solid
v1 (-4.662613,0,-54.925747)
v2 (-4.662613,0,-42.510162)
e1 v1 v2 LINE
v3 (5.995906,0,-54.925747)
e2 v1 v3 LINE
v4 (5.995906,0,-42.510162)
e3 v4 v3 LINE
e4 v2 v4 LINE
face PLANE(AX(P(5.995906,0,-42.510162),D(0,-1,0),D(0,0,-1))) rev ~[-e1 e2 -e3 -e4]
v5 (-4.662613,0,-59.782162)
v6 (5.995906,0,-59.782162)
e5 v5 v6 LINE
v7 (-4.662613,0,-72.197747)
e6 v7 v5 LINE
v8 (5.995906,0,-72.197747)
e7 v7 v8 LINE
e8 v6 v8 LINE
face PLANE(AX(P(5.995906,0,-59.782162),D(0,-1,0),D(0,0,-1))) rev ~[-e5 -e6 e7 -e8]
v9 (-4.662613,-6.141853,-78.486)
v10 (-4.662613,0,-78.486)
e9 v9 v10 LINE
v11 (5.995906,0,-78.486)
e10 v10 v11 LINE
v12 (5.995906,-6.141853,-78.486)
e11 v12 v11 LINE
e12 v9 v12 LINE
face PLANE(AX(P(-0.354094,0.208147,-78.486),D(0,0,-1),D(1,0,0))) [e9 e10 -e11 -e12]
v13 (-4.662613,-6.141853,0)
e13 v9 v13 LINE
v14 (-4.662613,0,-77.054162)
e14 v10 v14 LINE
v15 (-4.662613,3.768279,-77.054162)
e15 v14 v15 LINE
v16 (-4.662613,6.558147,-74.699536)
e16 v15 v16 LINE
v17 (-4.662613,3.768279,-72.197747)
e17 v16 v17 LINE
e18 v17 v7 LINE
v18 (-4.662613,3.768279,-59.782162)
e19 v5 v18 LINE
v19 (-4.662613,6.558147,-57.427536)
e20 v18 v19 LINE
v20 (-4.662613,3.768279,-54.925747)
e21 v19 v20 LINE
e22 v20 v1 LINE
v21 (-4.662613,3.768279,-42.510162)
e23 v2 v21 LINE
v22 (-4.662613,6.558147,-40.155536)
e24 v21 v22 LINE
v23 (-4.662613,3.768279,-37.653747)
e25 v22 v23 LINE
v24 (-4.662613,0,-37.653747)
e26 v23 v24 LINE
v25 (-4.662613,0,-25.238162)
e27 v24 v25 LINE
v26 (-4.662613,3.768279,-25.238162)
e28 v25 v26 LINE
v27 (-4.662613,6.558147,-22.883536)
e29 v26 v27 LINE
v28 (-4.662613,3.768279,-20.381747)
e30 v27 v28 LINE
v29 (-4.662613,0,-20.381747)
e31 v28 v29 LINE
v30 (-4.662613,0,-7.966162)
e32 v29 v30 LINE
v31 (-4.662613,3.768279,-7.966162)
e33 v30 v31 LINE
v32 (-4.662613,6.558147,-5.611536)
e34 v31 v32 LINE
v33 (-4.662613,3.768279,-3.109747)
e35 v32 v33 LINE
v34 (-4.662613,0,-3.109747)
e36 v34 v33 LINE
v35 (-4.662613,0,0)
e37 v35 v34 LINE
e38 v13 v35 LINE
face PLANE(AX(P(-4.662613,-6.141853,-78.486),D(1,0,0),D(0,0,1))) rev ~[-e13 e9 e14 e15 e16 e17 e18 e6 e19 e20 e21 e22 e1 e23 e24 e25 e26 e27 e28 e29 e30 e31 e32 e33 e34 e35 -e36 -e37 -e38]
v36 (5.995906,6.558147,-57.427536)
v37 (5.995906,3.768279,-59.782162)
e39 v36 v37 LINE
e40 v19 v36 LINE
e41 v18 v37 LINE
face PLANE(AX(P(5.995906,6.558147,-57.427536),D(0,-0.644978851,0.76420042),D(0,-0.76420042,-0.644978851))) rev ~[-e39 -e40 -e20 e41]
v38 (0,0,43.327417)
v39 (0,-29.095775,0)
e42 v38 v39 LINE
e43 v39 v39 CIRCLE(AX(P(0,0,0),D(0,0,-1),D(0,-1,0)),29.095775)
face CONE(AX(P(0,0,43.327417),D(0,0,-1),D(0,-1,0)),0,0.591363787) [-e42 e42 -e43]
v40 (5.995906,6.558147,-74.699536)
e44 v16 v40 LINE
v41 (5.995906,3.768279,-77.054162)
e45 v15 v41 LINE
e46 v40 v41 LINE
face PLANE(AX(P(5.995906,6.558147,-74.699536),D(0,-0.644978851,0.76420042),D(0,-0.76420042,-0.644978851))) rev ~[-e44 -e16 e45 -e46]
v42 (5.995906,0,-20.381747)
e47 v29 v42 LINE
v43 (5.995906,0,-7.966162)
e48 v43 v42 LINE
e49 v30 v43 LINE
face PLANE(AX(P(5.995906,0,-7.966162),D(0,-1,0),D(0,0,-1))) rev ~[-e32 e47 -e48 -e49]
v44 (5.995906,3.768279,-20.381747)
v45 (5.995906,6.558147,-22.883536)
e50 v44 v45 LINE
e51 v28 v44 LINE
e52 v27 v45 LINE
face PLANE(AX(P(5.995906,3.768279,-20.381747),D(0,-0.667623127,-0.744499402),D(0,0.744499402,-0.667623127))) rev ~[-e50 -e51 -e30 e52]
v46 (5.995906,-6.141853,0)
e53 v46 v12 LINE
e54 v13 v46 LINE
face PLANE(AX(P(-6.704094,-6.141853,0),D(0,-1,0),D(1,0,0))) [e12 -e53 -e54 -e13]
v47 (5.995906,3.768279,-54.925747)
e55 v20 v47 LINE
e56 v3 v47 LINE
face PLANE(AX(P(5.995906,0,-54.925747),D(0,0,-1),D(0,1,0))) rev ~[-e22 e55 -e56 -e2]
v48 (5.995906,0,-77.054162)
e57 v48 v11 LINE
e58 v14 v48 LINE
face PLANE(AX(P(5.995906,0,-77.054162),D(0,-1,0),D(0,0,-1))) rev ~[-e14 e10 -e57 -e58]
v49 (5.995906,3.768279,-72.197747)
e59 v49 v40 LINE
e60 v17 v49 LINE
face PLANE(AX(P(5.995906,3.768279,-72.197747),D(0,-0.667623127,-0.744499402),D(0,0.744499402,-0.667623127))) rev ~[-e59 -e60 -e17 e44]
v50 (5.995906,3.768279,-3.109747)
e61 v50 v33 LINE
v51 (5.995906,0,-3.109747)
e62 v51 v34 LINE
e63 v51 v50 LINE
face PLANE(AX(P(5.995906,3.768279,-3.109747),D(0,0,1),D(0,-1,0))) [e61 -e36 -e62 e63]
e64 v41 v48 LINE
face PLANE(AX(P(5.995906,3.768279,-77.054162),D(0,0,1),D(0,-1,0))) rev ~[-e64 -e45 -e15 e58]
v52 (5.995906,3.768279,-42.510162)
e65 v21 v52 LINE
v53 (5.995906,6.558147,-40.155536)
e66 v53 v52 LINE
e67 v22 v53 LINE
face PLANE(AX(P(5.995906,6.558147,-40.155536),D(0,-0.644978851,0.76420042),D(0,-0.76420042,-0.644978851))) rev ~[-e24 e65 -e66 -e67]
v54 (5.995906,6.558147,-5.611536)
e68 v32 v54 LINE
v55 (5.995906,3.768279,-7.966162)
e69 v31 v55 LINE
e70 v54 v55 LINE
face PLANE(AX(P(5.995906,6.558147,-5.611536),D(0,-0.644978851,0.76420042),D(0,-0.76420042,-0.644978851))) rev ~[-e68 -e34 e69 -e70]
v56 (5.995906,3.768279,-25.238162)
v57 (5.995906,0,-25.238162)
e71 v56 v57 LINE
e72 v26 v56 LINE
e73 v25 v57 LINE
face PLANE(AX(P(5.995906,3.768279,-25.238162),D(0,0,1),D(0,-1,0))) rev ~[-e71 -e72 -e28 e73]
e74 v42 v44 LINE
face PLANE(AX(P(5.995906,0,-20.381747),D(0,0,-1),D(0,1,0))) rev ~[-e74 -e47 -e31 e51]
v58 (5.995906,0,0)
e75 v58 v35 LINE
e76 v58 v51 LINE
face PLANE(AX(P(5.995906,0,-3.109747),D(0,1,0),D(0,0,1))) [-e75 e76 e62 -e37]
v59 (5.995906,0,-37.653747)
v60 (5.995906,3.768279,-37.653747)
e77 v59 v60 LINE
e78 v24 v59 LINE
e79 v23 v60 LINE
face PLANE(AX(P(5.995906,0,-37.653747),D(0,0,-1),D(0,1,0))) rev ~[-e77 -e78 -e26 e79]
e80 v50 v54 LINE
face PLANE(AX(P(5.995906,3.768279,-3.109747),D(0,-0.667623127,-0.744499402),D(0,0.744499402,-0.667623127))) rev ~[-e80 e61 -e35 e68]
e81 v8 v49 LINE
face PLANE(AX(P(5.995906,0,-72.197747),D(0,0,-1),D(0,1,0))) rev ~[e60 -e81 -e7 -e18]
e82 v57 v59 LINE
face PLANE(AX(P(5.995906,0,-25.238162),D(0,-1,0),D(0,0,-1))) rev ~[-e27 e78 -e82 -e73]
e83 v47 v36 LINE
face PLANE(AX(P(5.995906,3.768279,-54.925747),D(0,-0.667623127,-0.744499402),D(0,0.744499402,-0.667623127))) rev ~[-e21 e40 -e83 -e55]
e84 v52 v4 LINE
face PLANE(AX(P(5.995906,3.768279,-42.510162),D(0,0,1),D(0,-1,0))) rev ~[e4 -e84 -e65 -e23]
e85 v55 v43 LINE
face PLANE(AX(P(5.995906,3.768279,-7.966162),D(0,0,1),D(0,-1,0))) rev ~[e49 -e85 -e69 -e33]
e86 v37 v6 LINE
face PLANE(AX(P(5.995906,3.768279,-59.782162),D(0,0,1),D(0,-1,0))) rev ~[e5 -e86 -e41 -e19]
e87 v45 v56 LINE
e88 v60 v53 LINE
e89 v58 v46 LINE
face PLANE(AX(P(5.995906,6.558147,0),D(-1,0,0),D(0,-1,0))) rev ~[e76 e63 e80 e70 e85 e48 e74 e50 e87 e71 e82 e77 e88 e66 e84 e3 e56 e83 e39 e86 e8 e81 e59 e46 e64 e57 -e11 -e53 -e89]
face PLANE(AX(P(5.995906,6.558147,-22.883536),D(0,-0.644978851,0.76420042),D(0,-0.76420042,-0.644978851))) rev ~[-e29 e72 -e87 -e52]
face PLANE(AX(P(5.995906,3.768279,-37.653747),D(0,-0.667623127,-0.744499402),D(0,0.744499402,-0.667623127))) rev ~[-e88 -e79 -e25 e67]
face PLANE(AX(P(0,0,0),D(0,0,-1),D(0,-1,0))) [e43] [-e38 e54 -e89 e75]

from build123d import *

# Parameters (mm, degrees)
F3_W      = 12.7
F3_H      = 12.7
F4_DEPTH  = 78.486
F6_DEPTH  = 56.134
F8_DEPTH  = 25.4
F10_DEPTH = 25.4


# Not quite as in the source:
# - a feature names something its author has since deleted; it is built from what else it names


with BuildPart() as f1:
    # F0 (on Right) → F1 (revolve)
    with BuildSketch(Plane.YZ):
        Polygon((0, 43.3274172246), (-29.0957745165, 0), (0, 0), align=None)
    revolve(axis=Axis((0, 0, 21.6637086123), (0, 0, -1)))

    # F3 (on face) → F4 (join)
    with BuildSketch(Plane(origin=(0, 0, 0), x_dir=(1, 0, 0), z_dir=(0, 0, -1))):
        with Locations((-0.3540940419, -0.2081472591)):
            Rectangle(F3_W, F3_H)
    extrude(amount=F4_DEPTH)

    # F5 (on face) → F6 (join)
    with BuildSketch(Plane.YZ.offset(5.9959059581)):
        Polygon((0, -7.9661617056), (0, -3.1097470783), (0, 0), (-6.1418527409, 0), (-6.1418527409, -78.486), (0, -78.486), (0, -77.0541617056), (0, -72.1977470783), (0, -59.7821617056), (0, -54.9257470783), (0, -42.5101617056), (0, -37.6537470783), (0, -25.2381617056), (0, -20.3817470783), align=None)
        Polygon((3.7682792172, -3.1097470783), (0, -3.1097470783), (0, -7.9661617056), (3.7682792172, -7.9661617056), (6.5581472591, -5.6115360931), align=None)
        Polygon((3.7682792172, -20.3817470783), (0, -20.3817470783), (0, -25.2381617056), (3.7682792172, -25.2381617056), (6.5581472591, -22.8835360931), align=None)
        Polygon((3.7682792172, -42.5101617056), (6.5581472591, -40.1555360931), (3.7682792172, -37.6537470783), (0, -37.6537470783), (0, -42.5101617056), align=None)
        Polygon((3.7682792172, -59.7821617056), (6.5581472591, -57.4275360931), (3.7682792172, -54.9257470783), (0, -54.9257470783), (0, -59.7821617056), align=None)
        Polygon((0, -72.1977470783), (0, -77.0541617056), (3.7682792172, -77.0541617056), (6.5581472591, -74.6995360931), (3.7682792172, -72.1977470783), align=None)
    extrude(amount=-F6_DEPTH)

    # F5 (on face) → F8 (cut)
    with BuildSketch(Plane.YZ.offset(5.9959059581)):
        Polygon((0, 0), (0, -3.1097470783), (3.7682792172, -3.1097470783), (6.5581472591, -5.6115360931), (6.5581472591, 0), align=None)
        Polygon((3.7682792172, -7.9661617056), (0, -7.9661617056), (0, -20.3817470783), (3.7682792172, -20.3817470783), (6.5581472591, -22.8835360931), (6.5581472591, -5.6115360931), align=None)
        Polygon((6.5581472591, -40.1555360931), (6.5581472591, -22.8835360931), (3.7682792172, -25.2381617056), (0, -25.2381617056), (0, -37.6537470783), (3.7682792172, -37.6537470783), align=None)
        Polygon((6.5581472591, -57.4275360931), (6.5581472591, -40.1555360931), (3.7682792172, -42.5101617056), (0, -42.5101617056), (0, -54.9257470783), (3.7682792172, -54.9257470783), align=None)
        Polygon((6.5581472591, -74.6995360931), (6.5581472591, -57.4275360931), (3.7682792172, -59.7821617056), (0, -59.7821617056), (0, -72.1977470783), (3.7682792172, -72.1977470783), align=None)
        Polygon((0, -77.0541617056), (0, -78.486), (6.5581472591, -78.486), (6.5581472591, -74.6995360931), (3.7682792172, -77.0541617056), align=None)
    extrude(amount=-F8_DEPTH, mode=Mode.SUBTRACT)

    # F9 (on face) → F10 (cut)
    with BuildSketch(Plane.XZ.offset(6.1418527409)):
        Polygon((-4.6626133844, -78.486), (-4.6626133844, 0), (-28.4401431013, 0), (-50.1380940419, 0), (-50.1380940419, -78.486), align=None)
    extrude(amount=-F10_DEPTH, mode=Mode.SUBTRACT)


with BuildPart() as f2:
    # F0 (on Right) → F2 (revolve)
    with BuildSketch(Plane.YZ):
        Polygon((122.2083866596, 0), (151.3041611761, 0), (122.2083866596, 43.3274172246), align=None)
    revolve(axis=Axis((0, 122.2083866596, 21.6637086123), (0, 0, -1)))


solid = f1.part
